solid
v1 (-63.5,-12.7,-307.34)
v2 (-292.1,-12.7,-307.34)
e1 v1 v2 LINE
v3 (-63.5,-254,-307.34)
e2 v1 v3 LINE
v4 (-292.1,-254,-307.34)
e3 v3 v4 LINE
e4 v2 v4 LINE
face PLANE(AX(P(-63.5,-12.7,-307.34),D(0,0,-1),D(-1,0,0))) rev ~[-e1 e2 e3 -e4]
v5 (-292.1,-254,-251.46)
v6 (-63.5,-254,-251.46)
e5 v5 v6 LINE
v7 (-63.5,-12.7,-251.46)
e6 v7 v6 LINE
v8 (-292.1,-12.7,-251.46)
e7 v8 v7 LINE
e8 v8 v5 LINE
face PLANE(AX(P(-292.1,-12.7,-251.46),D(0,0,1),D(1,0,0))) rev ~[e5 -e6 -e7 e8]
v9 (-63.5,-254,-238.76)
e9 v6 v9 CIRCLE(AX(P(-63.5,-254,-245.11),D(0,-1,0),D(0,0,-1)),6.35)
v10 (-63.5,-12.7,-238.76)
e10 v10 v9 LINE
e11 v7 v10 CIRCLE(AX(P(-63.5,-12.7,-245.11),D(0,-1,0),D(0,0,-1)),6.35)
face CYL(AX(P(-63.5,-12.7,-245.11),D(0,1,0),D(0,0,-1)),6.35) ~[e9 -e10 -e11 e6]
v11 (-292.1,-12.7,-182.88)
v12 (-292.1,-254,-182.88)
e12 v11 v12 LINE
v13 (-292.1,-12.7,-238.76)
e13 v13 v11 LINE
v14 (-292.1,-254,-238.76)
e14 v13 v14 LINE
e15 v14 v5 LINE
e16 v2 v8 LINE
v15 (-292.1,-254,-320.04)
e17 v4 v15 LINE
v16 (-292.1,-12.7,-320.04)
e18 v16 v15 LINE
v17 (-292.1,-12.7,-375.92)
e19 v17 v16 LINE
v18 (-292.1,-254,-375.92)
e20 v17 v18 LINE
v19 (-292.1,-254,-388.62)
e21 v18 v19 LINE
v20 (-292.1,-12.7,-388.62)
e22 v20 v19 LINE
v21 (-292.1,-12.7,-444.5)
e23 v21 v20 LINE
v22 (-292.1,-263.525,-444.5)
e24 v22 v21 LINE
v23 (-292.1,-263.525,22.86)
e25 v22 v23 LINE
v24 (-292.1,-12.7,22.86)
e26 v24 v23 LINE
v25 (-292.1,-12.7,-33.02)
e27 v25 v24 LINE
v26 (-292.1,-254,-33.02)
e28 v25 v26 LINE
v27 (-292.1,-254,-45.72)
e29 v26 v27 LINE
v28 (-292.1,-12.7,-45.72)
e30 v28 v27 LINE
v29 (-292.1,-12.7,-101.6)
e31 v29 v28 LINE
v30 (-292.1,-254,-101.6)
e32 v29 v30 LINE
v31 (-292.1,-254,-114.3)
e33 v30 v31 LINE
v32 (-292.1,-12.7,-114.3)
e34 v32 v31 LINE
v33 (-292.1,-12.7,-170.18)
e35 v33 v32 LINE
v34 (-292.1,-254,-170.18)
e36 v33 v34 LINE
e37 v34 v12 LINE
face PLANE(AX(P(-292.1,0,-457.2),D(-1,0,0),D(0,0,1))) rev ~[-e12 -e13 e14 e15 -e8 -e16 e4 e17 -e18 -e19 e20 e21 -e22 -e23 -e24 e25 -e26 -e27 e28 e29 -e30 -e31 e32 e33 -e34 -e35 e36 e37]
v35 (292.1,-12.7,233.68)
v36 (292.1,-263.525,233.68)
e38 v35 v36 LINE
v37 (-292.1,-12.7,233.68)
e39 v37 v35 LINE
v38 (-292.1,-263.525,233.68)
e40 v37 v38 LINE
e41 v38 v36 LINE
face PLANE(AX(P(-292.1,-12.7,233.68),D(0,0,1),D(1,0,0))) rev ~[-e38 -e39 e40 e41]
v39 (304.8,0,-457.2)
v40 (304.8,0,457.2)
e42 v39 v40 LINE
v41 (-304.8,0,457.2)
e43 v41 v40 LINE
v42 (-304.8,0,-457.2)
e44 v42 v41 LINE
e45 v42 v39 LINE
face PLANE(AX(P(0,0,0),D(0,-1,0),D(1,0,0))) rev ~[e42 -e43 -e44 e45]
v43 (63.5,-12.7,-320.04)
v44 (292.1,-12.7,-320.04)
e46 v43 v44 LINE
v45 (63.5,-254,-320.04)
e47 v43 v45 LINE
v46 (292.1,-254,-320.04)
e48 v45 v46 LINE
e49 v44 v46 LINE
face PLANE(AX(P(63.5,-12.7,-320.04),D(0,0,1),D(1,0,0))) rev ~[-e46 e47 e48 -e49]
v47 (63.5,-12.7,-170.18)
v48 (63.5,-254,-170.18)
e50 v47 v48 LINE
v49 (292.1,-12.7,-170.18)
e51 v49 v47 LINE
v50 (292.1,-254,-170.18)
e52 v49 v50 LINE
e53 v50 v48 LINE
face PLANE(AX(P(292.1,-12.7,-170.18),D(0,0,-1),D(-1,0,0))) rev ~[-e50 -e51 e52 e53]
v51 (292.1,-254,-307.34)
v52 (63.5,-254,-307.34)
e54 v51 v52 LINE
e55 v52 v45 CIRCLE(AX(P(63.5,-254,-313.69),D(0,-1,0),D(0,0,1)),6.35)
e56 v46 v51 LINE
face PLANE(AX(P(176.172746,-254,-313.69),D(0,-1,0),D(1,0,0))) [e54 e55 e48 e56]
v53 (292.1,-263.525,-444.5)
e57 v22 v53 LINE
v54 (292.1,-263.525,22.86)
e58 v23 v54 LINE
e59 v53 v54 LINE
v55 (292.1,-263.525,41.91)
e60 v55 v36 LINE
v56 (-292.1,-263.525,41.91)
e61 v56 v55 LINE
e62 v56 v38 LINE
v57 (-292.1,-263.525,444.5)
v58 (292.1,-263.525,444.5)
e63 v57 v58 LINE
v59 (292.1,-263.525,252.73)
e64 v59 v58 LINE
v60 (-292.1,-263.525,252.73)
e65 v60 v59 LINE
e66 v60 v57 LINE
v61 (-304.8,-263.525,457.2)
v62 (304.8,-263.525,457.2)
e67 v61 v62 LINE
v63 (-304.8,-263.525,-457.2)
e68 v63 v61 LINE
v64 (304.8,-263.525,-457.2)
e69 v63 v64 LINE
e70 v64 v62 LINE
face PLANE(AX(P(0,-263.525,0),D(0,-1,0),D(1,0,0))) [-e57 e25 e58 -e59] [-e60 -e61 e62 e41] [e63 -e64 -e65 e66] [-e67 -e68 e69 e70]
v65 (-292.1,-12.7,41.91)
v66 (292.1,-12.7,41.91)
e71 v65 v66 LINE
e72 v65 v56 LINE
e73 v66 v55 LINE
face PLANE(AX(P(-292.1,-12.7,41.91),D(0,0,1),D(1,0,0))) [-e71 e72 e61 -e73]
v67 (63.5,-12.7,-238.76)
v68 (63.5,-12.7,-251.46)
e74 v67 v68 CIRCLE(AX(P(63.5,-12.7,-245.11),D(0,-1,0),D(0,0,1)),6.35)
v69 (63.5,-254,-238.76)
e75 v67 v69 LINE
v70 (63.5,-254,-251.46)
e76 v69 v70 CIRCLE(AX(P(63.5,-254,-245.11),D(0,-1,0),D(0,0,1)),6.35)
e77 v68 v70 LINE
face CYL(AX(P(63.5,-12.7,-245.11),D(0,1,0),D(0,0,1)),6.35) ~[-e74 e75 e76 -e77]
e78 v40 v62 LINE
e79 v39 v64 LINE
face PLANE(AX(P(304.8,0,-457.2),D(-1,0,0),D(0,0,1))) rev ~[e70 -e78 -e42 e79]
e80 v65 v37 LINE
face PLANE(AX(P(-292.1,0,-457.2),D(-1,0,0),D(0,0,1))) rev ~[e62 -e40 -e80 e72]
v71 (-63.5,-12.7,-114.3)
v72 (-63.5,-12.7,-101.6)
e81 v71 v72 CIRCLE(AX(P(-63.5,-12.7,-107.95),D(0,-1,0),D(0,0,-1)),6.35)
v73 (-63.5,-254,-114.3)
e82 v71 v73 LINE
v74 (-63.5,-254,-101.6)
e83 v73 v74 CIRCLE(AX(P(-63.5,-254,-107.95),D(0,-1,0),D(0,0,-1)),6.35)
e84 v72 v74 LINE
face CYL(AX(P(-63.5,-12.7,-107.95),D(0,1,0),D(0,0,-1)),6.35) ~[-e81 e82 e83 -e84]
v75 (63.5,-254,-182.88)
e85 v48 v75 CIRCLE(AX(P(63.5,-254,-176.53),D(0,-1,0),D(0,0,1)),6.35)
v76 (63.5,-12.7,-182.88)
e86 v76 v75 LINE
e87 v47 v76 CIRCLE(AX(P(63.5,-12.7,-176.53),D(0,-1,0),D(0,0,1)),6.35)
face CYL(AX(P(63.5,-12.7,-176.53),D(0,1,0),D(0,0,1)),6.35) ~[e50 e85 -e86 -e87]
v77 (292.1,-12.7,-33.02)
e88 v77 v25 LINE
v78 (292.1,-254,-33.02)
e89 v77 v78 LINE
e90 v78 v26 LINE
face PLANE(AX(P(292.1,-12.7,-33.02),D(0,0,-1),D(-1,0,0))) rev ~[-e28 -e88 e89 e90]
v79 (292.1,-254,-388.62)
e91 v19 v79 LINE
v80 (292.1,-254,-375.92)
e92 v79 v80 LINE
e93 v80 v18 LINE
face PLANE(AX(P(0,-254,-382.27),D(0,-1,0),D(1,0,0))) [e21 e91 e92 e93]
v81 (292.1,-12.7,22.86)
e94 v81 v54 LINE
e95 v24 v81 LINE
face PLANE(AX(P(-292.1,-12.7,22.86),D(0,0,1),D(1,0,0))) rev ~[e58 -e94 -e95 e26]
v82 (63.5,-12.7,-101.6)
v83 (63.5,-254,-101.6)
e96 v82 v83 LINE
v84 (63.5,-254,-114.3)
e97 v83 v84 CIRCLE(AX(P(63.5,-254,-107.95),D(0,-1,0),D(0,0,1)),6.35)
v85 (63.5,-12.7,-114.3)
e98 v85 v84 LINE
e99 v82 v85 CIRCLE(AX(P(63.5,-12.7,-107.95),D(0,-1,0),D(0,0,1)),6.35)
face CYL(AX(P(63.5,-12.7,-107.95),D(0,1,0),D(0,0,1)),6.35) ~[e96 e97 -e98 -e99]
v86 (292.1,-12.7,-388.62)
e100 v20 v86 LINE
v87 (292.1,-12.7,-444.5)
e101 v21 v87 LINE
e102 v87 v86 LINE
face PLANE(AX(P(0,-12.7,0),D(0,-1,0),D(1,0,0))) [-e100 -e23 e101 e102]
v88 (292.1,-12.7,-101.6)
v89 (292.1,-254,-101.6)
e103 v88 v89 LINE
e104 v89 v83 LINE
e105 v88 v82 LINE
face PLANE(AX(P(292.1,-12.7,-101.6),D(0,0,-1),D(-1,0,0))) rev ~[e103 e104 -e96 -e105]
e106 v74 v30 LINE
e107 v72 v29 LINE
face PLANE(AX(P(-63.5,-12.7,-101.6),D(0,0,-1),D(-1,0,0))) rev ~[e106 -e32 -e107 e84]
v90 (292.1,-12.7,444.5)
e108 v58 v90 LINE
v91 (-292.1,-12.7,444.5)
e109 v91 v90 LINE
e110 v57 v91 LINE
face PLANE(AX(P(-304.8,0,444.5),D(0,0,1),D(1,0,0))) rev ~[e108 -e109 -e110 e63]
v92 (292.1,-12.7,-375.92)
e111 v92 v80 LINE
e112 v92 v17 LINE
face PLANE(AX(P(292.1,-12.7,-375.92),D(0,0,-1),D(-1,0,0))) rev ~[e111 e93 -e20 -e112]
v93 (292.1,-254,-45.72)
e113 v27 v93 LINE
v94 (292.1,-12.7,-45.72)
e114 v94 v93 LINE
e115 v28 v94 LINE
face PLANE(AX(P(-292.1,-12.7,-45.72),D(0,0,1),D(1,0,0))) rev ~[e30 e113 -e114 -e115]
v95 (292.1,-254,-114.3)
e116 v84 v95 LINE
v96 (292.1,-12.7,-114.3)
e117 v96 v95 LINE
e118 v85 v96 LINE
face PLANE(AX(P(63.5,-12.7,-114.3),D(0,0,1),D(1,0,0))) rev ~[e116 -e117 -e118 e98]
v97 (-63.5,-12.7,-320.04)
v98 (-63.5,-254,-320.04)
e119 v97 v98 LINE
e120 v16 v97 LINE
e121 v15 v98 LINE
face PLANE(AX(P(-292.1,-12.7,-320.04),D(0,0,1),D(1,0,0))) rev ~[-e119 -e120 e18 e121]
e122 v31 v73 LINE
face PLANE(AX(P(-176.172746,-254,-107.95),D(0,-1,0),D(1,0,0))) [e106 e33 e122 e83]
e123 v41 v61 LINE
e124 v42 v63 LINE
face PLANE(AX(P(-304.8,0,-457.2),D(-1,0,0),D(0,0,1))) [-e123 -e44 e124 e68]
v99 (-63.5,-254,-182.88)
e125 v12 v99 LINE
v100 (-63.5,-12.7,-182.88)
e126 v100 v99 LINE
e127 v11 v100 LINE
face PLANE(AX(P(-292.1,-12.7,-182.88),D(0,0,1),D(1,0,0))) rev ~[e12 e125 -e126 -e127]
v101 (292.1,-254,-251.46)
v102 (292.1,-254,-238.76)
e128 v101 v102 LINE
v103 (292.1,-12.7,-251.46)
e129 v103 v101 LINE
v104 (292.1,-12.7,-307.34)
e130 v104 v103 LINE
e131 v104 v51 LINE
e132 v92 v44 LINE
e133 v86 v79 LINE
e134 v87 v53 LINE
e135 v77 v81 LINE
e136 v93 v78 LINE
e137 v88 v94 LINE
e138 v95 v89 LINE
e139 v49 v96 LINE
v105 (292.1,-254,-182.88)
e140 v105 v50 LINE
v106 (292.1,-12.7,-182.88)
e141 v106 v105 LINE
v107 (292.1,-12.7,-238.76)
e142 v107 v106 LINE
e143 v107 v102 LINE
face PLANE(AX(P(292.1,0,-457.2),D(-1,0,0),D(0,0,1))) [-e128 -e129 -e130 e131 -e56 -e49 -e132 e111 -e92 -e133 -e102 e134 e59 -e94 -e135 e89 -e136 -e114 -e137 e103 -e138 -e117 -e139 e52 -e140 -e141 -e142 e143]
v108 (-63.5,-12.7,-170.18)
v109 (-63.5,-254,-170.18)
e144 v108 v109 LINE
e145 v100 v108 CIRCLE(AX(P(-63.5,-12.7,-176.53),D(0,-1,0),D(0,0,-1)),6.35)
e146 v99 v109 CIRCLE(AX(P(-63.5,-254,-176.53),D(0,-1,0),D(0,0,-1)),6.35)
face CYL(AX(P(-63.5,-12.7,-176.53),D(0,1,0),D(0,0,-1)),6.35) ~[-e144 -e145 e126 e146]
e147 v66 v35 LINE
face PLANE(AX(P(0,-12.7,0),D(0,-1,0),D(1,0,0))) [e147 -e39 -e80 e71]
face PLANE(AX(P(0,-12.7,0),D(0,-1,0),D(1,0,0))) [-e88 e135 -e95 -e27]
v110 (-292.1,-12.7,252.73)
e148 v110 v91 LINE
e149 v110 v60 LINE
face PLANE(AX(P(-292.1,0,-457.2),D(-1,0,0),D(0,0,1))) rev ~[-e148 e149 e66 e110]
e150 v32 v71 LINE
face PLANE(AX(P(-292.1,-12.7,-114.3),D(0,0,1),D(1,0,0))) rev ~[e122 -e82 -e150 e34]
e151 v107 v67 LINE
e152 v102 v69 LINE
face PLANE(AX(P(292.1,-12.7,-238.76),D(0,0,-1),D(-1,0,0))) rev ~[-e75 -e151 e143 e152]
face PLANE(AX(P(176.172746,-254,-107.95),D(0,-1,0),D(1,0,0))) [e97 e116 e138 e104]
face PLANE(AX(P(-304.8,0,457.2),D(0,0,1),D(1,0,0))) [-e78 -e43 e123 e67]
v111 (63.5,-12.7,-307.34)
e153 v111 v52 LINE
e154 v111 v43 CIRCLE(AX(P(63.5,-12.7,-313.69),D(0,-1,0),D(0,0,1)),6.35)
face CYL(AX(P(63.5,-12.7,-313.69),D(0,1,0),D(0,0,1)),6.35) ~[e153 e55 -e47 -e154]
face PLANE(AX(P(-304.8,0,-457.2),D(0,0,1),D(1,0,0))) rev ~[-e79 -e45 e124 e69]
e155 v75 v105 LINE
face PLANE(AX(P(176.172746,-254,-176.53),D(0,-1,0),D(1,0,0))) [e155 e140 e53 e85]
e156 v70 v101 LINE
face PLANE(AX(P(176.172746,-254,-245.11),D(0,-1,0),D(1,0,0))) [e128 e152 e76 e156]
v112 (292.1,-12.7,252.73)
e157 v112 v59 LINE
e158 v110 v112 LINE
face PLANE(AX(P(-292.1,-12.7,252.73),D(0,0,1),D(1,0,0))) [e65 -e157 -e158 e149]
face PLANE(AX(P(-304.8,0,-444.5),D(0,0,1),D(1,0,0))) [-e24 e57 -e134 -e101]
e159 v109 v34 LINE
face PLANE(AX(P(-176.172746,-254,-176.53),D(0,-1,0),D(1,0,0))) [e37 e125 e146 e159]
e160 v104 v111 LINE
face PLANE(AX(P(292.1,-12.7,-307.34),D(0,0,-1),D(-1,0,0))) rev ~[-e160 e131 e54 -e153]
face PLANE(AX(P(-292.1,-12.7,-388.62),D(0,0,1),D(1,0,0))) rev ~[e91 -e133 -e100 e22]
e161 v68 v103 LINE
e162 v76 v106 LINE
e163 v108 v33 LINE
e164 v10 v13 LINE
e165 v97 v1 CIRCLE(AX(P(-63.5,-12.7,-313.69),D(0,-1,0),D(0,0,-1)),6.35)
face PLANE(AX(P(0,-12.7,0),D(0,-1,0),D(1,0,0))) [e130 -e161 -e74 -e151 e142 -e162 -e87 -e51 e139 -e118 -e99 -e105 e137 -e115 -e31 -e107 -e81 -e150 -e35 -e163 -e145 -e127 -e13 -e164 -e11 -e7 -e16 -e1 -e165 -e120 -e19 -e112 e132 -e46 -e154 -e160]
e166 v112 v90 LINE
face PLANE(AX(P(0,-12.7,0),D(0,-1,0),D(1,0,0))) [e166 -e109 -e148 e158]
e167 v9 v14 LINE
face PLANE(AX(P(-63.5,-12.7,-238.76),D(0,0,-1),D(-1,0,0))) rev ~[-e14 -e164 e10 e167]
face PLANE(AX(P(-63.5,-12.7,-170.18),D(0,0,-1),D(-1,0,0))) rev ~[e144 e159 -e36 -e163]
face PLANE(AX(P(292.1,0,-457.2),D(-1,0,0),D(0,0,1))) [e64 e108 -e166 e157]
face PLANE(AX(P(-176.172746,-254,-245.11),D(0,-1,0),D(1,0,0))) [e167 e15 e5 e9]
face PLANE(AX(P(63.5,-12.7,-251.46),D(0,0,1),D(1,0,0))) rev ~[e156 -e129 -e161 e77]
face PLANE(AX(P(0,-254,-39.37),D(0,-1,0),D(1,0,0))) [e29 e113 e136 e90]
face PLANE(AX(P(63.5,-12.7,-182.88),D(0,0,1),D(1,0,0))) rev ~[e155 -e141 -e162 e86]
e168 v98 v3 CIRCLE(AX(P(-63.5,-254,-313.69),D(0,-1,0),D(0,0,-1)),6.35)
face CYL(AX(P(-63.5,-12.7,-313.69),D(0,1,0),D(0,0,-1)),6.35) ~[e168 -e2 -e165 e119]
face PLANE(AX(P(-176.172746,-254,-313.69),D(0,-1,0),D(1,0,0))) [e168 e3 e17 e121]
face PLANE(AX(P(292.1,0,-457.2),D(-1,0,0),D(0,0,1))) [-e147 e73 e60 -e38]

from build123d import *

# Parameters (mm, degrees)
F0_W     = 609.6
F0_H     = 914.4
F1_DEPTH = 263.525
F2_T     = -12.7
F3_W     = 584.2
F3_H     = 19.05
F4_DEPTH = 250.825
F6_DEPTH = 241.3
F7_DEPTH = 241.3


# Not quite as in the source:
# - a feature names something its author has since deleted; it is built from what else it names


with BuildPart() as f1:
    # F0 (on Front) → F1 (new body)
    with BuildSketch(Plane.XZ):
        Rectangle(F0_W, F0_H)
    extrude(amount=F1_DEPTH)

    # F2
    f2_openings = [f1.faces().sort_by_distance(p)[0] for p in [
        (0, -263.525, 0),
    ]]
    offset(amount=F2_T, openings=f2_openings)

    # F3 (on face) → F4 (join)
    with BuildSketch(Plane.XZ.offset(12.7)):
        with Locations((0, 32.385)):
            Rectangle(F3_W, F3_H)
        with Locations((0, 243.205)):
            Rectangle(F3_W, F3_H)
    extrude(amount=F4_DEPTH)

    # F5 (on face) → F6 (join)
    with BuildSketch(Plane.XZ.offset(12.7)):
        Polygon((-63.5, -33.02), (-292.1, -33.02), (-292.1, -45.72), (-63.5, -45.72), (63.5, -45.72), (292.1, -45.72), (292.1, -33.02), (63.5, -33.02), align=None)
    extrude(amount=F6_DEPTH)

    # F5 (on face) → F7 (join)
    with BuildSketch(Plane.XZ.offset(12.7)):
        with BuildLine():
            Line((292.1, -182.88), (292.1, -170.18))
            Line((292.1, -170.18), (63.5, -170.18))
            ThreePointArc((63.5, -170.18), (57.15, -176.53), (63.5, -182.88))
            Line((63.5, -182.88), (292.1, -182.88))
        make_face()
        with BuildLine():
            Line((292.1, -114.3), (292.1, -101.6))
            Line((292.1, -101.6), (63.5, -101.6))
            ThreePointArc((63.5, -101.6), (57.15, -107.95), (63.5, -114.3))
            Line((63.5, -114.3), (292.1, -114.3))
        make_face()
        Polygon((-63.5, -33.02), (-292.1, -33.02), (-292.1, -45.72), (-63.5, -45.72), (63.5, -45.72), (292.1, -45.72), (292.1, -33.02), (63.5, -33.02), align=None)
        with BuildLine():
            Line((-63.5, -170.18), (-292.1, -170.18))
            Line((-292.1, -170.18), (-292.1, -182.88))
            Line((-292.1, -182.88), (-63.5, -182.88))
            ThreePointArc((-63.5, -182.88), (-57.15, -176.53), (-63.5, -170.18))
        make_face()
        with BuildLine():
            Line((-63.5, -101.6), (-292.1, -101.6))
            Line((-292.1, -101.6), (-292.1, -114.3))
            Line((-292.1, -114.3), (-63.5, -114.3))
            ThreePointArc((-63.5, -114.3), (-57.15, -107.95), (-63.5, -101.6))
        make_face()
        with BuildLine():
            Line((-63.5, -238.76), (-292.1, -238.76))
            Line((-292.1, -238.76), (-292.1, -251.46))
            Line((-292.1, -251.46), (-63.5, -251.46))
            ThreePointArc((-63.5, -251.46), (-57.15, -245.11), (-63.5, -238.76))
        make_face()
        with BuildLine():
            Line((292.1, -251.46), (292.1, -238.76))
            Line((292.1, -238.76), (63.5, -238.76))
            ThreePointArc((63.5, -238.76), (57.15, -245.11), (63.5, -251.46))
            Line((63.5, -251.46), (292.1, -251.46))
        make_face()
        with BuildLine():
            Line((292.1, -320.04), (292.1, -307.34))
            Line((292.1, -307.34), (63.5, -307.34))
            ThreePointArc((63.5, -307.34), (57.15, -313.69), (63.5, -320.04))
            Line((63.5, -320.04), (292.1, -320.04))
        make_face()
        with BuildLine():
            Line((-63.5, -307.34), (-292.1, -307.34))
            Line((-292.1, -307.34), (-292.1, -320.04))
            Line((-292.1, -320.04), (-63.5, -320.04))
            ThreePointArc((-63.5, -320.04), (-57.15, -313.69), (-63.5, -307.34))
        make_face()
        Polygon((-63.5, -375.92), (-292.1, -375.92), (-292.1, -388.62), (-63.5, -388.62), (63.5, -388.62), (292.1, -388.62), (292.1, -375.92), (63.5, -375.92), align=None)
    extrude(amount=F7_DEPTH)


solid = f1.part
